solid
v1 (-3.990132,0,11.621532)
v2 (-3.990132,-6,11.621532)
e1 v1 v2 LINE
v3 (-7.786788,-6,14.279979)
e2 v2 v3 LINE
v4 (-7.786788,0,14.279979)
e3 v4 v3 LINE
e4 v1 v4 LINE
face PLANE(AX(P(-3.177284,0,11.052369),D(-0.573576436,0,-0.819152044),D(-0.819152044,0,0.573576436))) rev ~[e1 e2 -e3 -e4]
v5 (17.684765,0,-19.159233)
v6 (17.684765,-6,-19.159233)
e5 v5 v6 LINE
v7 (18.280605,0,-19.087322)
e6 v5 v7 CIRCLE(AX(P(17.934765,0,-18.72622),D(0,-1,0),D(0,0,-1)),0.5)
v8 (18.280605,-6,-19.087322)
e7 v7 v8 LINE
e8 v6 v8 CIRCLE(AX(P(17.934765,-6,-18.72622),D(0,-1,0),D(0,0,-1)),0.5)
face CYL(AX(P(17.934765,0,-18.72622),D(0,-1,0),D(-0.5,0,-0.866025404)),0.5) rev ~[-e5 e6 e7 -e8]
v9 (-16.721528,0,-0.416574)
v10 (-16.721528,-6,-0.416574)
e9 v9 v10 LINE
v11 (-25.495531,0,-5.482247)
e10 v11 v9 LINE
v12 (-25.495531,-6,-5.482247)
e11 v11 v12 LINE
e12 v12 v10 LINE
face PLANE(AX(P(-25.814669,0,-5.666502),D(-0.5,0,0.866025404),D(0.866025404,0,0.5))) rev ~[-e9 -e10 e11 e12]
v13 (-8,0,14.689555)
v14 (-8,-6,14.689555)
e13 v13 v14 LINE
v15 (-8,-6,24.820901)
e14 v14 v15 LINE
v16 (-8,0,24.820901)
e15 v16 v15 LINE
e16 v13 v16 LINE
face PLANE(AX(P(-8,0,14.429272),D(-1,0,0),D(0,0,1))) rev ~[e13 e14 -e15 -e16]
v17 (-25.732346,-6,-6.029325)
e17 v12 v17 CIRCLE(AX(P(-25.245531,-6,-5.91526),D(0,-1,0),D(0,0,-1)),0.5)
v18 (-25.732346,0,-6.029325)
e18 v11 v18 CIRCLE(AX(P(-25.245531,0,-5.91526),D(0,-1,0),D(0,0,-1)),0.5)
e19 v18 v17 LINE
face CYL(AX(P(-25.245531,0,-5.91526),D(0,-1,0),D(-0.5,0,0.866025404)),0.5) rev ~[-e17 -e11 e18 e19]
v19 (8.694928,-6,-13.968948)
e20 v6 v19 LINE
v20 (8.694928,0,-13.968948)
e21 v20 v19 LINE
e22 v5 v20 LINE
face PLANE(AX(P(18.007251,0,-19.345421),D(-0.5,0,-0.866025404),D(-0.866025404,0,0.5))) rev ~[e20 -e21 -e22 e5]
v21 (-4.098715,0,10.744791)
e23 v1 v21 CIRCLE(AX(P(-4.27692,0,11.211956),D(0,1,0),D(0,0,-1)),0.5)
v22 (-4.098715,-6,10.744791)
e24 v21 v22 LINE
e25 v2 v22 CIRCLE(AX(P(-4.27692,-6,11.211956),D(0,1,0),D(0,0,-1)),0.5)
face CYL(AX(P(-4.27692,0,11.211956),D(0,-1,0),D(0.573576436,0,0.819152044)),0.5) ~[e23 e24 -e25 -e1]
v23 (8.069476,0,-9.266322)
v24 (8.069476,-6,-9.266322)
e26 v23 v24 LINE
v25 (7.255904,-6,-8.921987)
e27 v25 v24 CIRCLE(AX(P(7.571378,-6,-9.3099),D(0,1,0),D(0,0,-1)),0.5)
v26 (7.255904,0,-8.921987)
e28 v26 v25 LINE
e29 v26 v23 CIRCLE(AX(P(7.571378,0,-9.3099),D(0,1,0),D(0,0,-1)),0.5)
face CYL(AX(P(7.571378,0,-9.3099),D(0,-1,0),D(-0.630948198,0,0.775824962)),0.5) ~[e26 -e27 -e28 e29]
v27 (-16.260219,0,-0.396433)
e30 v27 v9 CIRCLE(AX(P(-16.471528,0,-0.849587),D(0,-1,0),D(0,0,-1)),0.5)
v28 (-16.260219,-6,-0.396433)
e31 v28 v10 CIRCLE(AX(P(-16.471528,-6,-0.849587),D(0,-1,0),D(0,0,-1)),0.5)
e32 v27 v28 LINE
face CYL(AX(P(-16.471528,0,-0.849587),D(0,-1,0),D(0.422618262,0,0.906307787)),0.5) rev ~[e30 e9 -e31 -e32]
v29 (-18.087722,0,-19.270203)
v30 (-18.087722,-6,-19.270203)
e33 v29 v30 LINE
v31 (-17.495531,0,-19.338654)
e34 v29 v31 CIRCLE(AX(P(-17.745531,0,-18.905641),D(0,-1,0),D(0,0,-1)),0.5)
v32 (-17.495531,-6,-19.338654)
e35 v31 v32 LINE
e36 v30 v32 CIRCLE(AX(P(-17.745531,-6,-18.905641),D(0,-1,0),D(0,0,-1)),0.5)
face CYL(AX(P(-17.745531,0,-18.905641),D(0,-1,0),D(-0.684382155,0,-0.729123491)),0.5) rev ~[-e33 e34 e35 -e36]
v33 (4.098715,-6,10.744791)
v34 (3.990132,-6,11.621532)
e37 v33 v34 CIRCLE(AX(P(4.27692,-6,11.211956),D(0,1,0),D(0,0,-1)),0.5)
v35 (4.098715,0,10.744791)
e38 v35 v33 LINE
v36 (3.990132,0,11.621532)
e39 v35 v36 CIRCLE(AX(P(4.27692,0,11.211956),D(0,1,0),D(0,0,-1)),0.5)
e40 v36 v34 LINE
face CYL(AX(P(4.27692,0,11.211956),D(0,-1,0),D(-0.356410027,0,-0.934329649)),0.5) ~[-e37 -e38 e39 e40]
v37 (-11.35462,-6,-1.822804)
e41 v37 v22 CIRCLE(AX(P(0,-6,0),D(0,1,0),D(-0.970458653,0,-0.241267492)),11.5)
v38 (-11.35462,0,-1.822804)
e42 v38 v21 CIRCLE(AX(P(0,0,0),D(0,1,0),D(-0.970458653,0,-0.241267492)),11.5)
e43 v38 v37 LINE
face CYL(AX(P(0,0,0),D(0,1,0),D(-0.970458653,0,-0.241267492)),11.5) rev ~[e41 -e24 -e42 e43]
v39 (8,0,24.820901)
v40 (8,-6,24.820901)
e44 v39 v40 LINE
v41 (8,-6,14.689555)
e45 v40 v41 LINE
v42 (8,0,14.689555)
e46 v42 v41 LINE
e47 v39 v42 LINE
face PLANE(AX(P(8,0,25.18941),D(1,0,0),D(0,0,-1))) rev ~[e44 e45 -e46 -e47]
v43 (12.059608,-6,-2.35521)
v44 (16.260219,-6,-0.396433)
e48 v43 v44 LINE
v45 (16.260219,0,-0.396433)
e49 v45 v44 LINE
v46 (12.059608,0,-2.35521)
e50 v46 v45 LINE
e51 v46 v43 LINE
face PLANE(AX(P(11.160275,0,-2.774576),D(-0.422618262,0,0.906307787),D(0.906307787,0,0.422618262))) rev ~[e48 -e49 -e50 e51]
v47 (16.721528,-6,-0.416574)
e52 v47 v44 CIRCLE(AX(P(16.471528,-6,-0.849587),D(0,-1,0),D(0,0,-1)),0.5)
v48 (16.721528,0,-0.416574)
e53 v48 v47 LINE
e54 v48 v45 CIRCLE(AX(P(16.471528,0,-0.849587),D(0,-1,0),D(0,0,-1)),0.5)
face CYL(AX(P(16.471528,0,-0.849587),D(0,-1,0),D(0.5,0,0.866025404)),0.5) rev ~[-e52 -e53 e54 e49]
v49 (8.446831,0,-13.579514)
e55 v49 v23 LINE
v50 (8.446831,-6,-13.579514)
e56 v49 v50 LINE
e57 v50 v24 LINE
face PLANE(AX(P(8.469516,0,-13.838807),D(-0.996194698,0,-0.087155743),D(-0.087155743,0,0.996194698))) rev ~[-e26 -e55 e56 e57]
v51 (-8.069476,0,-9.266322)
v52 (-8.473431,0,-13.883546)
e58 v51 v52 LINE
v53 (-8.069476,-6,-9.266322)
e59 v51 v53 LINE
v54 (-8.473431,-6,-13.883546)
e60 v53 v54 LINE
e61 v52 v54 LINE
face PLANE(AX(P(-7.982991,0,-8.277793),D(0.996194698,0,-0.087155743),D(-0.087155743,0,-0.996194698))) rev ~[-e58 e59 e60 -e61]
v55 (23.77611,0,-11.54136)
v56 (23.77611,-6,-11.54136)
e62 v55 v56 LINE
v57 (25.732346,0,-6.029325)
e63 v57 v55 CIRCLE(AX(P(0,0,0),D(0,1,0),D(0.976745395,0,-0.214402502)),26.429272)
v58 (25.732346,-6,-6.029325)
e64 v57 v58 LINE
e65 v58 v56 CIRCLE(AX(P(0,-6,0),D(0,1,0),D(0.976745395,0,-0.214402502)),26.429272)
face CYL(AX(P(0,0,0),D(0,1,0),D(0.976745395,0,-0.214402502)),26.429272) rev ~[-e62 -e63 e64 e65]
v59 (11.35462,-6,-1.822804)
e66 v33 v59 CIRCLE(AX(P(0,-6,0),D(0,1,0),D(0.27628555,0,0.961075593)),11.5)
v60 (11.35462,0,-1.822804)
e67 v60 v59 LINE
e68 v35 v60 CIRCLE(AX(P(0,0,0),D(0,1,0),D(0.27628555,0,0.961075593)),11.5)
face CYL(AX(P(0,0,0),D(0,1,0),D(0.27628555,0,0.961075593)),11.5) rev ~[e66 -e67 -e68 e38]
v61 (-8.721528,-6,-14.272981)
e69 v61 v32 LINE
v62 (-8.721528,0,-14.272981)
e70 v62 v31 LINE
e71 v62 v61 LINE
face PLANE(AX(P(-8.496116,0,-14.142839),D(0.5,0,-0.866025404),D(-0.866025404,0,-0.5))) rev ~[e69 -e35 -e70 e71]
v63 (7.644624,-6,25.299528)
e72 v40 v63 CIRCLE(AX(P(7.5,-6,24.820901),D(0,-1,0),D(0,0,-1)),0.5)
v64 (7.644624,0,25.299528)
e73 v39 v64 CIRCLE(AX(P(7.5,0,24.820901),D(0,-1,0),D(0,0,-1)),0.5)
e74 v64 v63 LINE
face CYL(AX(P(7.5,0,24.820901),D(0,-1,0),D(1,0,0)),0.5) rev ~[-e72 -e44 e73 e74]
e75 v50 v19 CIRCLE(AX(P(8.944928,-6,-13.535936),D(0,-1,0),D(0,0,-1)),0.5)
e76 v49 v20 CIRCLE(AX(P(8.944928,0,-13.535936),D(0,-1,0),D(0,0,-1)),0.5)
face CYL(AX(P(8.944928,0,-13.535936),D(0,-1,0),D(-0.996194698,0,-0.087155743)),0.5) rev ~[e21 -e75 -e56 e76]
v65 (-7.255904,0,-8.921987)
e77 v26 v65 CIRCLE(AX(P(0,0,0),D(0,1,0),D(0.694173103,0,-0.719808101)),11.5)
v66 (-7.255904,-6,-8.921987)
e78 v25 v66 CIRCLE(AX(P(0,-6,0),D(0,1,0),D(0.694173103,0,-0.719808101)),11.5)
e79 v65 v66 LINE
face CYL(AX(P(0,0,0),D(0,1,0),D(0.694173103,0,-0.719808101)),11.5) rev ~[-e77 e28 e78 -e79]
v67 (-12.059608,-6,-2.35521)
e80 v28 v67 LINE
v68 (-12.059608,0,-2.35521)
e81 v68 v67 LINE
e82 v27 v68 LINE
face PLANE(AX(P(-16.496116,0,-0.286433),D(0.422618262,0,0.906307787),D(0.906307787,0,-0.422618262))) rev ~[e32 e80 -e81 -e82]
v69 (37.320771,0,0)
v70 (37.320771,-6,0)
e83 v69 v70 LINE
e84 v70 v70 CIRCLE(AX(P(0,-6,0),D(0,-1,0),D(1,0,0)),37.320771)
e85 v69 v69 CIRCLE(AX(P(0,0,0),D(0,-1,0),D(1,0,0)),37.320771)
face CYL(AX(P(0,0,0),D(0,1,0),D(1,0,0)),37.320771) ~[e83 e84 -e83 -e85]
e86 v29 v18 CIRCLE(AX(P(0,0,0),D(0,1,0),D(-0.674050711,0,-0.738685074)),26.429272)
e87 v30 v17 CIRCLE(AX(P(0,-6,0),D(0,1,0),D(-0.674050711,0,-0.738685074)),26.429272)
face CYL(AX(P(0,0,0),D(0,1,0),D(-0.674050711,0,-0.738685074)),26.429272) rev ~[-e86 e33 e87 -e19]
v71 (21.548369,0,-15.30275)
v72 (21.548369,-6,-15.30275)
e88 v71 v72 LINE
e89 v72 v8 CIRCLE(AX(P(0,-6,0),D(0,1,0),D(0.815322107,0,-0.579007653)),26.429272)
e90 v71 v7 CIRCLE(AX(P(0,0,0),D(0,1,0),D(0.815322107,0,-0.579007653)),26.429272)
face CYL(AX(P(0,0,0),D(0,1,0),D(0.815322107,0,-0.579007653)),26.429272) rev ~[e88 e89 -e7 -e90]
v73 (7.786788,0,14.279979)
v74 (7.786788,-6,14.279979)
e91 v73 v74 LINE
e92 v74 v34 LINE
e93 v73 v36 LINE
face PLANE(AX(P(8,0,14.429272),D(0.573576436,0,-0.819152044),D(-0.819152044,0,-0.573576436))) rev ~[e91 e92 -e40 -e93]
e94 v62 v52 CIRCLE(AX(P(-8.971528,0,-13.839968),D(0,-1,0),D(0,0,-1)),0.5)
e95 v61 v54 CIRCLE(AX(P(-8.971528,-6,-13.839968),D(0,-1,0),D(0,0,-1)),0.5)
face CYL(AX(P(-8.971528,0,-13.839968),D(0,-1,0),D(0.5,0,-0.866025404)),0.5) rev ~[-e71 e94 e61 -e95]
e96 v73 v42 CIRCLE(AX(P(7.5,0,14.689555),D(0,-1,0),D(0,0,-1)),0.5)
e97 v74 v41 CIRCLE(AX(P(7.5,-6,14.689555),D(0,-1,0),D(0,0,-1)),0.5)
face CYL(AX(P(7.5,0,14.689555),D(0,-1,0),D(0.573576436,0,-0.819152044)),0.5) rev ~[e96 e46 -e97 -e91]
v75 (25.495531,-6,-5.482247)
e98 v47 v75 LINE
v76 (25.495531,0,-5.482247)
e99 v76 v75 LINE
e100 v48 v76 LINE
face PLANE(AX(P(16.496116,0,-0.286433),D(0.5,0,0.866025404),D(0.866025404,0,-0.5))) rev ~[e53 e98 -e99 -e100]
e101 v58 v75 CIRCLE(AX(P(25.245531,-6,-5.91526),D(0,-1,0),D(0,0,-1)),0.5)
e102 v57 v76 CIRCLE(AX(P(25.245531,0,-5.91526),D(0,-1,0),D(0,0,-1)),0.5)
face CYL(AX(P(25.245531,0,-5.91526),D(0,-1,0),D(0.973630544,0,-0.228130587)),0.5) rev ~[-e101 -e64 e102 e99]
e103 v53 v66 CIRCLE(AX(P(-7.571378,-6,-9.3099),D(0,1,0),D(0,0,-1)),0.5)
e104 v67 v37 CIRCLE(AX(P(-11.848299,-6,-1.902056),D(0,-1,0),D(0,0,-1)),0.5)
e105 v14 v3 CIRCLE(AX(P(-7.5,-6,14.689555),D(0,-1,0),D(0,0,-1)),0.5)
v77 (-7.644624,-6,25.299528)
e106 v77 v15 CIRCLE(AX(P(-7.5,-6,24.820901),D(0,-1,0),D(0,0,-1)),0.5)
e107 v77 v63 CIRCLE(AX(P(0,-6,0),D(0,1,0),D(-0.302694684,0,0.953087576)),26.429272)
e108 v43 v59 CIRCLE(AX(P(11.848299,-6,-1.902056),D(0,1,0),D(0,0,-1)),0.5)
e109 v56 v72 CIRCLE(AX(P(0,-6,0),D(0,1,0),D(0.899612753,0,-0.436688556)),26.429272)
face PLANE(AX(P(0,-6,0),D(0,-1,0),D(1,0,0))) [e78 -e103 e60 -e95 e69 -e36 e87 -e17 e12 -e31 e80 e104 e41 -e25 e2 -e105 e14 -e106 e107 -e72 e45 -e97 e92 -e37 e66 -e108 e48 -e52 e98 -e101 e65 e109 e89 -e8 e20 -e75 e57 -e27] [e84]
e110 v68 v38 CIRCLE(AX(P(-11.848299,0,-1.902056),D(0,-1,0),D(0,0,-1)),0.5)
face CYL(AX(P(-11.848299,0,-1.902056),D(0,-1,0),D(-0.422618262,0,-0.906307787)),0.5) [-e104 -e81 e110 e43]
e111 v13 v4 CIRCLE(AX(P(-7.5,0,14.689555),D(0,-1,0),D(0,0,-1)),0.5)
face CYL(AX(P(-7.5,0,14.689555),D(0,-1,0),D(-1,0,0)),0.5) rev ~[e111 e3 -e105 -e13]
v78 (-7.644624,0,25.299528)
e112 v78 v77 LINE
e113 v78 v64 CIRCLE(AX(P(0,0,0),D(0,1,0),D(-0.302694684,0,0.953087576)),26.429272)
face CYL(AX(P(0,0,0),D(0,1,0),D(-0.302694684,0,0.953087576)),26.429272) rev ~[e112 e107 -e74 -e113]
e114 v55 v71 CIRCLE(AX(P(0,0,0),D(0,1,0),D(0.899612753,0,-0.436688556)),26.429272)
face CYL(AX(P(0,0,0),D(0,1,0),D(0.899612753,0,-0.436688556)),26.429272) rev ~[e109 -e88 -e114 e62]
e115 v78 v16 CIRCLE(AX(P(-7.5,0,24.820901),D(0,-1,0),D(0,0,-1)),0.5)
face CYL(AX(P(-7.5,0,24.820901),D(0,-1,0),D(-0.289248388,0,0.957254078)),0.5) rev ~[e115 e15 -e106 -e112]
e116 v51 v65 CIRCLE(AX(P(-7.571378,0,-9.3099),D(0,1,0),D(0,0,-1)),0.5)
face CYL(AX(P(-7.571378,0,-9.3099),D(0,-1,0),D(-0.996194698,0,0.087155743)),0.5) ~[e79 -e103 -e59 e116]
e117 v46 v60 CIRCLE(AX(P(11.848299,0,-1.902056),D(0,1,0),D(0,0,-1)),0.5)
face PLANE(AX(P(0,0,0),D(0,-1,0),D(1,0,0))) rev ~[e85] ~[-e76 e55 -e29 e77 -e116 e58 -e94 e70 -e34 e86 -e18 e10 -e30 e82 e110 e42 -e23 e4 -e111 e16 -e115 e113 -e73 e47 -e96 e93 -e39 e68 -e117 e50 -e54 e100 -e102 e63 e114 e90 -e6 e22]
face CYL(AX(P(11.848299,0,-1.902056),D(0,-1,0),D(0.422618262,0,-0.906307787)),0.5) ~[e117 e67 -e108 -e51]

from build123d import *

# Parameters (mm, degrees)
F0_R     = 37.3207707479
F1_DEPTH = 6
F2_R     = 0.5


# Not quite as in the source:
# - two fillets or chamfers of one size are made in one step


with BuildPart() as f1:
    # F0 (on Front) → F1 (new body)
    with BuildSketch(Plane.XZ):
        Circle(F0_R)
        with BuildLine():
            ThreePointArc((-11.1602745113, -2.7745761537), (-9.9592921435, 5.75), (-3.1772838218, 11.0523693168))
            Line((-3.1772838218, 11.0523693168), (-8, 14.4292715395))
            Line((-8, 14.4292715395), (-8, 25.1894103565))
            ThreePointArc((-8, 25.1894103565), (0, 26.4292715395), (8, 25.1894103565))
            Line((8, 25.1894103565), (8, 14.4292715395))
            Line((8, 14.4292715395), (3.1772838218, 11.0523693168))
            ThreePointArc((3.1772838218, 11.0523693168), (9.9592921435, 5.75), (11.1602745113, -2.7745761537))
            Line((11.1602745113, -2.7745761537), (16.4961157113, -0.2864325395))
            Line((16.4961157113, -0.2864325395), (25.8146692751, -5.666501948))
            ThreePointArc((25.8146692751, -5.666501948), (24.9687771204, -8.6640962149), (23.7761097196, -11.5413604358))
            ThreePointArc((23.7761097196, -11.5413604358), (22.7401432363, -13.4681951166), (21.5483693449, -15.3027504941))
            ThreePointArc((21.5483693449, -15.3027504941), (19.880834384, -17.4143279602), (18.0072512686, -19.3454205397))
            Line((18.0072512686, -19.3454205397), (8.4695163323, -13.8388067068))
            Line((8.4695163323, -13.8388067068), (7.9829906895, -8.2777931631))
            ThreePointArc((7.9829906895, -8.2777931631), (0, -11.5), (-7.9829906895, -8.2777931631))
            Line((-7.9829906895, -8.2777931631), (-8.4961157113, -14.142839))
            Line((-8.4961157113, -14.142839), (-17.8146692751, -19.5229084085))
            ThreePointArc((-17.8146692751, -19.5229084085), (-22.8884205567, -13.2146357697), (-25.8146692751, -5.666501948))
            Line((-25.8146692751, -5.666501948), (-16.4961157113, -0.2864325395))
            Line((-16.4961157113, -0.2864325395), (-11.1602745113, -2.7745761537))
        make_face(mode=Mode.SUBTRACT)
    extrude(amount=F1_DEPTH)

    # F2
    f2_edges = [f1.edges().sort_by_distance(p)[0] for p in [
        (-17.814669, -3, -19.522908),
        (-25.814669, -3, -5.666502),
        (-8.496116, -3, -14.142839),
        (-7.982991, -3, -8.277793),
        (7.982991, -3, -8.277793),
        (8.469516, -3, -13.838807),
        (18.007251, -3, -19.345421),
        (25.814669, -3, -5.666502),
        (16.496116, -3, -0.286433),
        (11.160275, -3, -2.774576),
        (3.177284, -3, 11.052369),
        (8, -3, 14.429272),
        (8, -3, 25.18941),
        (-8, -3, 25.18941),
        (-8, -3, 14.429272),
        (-3.177284, -3, 11.052369),
        (-11.160275, -3, -2.774576),
        (-16.496116, -3, -0.286433),
    ]]
    fillet(f2_edges, radius=F2_R)


solid = f1.part
